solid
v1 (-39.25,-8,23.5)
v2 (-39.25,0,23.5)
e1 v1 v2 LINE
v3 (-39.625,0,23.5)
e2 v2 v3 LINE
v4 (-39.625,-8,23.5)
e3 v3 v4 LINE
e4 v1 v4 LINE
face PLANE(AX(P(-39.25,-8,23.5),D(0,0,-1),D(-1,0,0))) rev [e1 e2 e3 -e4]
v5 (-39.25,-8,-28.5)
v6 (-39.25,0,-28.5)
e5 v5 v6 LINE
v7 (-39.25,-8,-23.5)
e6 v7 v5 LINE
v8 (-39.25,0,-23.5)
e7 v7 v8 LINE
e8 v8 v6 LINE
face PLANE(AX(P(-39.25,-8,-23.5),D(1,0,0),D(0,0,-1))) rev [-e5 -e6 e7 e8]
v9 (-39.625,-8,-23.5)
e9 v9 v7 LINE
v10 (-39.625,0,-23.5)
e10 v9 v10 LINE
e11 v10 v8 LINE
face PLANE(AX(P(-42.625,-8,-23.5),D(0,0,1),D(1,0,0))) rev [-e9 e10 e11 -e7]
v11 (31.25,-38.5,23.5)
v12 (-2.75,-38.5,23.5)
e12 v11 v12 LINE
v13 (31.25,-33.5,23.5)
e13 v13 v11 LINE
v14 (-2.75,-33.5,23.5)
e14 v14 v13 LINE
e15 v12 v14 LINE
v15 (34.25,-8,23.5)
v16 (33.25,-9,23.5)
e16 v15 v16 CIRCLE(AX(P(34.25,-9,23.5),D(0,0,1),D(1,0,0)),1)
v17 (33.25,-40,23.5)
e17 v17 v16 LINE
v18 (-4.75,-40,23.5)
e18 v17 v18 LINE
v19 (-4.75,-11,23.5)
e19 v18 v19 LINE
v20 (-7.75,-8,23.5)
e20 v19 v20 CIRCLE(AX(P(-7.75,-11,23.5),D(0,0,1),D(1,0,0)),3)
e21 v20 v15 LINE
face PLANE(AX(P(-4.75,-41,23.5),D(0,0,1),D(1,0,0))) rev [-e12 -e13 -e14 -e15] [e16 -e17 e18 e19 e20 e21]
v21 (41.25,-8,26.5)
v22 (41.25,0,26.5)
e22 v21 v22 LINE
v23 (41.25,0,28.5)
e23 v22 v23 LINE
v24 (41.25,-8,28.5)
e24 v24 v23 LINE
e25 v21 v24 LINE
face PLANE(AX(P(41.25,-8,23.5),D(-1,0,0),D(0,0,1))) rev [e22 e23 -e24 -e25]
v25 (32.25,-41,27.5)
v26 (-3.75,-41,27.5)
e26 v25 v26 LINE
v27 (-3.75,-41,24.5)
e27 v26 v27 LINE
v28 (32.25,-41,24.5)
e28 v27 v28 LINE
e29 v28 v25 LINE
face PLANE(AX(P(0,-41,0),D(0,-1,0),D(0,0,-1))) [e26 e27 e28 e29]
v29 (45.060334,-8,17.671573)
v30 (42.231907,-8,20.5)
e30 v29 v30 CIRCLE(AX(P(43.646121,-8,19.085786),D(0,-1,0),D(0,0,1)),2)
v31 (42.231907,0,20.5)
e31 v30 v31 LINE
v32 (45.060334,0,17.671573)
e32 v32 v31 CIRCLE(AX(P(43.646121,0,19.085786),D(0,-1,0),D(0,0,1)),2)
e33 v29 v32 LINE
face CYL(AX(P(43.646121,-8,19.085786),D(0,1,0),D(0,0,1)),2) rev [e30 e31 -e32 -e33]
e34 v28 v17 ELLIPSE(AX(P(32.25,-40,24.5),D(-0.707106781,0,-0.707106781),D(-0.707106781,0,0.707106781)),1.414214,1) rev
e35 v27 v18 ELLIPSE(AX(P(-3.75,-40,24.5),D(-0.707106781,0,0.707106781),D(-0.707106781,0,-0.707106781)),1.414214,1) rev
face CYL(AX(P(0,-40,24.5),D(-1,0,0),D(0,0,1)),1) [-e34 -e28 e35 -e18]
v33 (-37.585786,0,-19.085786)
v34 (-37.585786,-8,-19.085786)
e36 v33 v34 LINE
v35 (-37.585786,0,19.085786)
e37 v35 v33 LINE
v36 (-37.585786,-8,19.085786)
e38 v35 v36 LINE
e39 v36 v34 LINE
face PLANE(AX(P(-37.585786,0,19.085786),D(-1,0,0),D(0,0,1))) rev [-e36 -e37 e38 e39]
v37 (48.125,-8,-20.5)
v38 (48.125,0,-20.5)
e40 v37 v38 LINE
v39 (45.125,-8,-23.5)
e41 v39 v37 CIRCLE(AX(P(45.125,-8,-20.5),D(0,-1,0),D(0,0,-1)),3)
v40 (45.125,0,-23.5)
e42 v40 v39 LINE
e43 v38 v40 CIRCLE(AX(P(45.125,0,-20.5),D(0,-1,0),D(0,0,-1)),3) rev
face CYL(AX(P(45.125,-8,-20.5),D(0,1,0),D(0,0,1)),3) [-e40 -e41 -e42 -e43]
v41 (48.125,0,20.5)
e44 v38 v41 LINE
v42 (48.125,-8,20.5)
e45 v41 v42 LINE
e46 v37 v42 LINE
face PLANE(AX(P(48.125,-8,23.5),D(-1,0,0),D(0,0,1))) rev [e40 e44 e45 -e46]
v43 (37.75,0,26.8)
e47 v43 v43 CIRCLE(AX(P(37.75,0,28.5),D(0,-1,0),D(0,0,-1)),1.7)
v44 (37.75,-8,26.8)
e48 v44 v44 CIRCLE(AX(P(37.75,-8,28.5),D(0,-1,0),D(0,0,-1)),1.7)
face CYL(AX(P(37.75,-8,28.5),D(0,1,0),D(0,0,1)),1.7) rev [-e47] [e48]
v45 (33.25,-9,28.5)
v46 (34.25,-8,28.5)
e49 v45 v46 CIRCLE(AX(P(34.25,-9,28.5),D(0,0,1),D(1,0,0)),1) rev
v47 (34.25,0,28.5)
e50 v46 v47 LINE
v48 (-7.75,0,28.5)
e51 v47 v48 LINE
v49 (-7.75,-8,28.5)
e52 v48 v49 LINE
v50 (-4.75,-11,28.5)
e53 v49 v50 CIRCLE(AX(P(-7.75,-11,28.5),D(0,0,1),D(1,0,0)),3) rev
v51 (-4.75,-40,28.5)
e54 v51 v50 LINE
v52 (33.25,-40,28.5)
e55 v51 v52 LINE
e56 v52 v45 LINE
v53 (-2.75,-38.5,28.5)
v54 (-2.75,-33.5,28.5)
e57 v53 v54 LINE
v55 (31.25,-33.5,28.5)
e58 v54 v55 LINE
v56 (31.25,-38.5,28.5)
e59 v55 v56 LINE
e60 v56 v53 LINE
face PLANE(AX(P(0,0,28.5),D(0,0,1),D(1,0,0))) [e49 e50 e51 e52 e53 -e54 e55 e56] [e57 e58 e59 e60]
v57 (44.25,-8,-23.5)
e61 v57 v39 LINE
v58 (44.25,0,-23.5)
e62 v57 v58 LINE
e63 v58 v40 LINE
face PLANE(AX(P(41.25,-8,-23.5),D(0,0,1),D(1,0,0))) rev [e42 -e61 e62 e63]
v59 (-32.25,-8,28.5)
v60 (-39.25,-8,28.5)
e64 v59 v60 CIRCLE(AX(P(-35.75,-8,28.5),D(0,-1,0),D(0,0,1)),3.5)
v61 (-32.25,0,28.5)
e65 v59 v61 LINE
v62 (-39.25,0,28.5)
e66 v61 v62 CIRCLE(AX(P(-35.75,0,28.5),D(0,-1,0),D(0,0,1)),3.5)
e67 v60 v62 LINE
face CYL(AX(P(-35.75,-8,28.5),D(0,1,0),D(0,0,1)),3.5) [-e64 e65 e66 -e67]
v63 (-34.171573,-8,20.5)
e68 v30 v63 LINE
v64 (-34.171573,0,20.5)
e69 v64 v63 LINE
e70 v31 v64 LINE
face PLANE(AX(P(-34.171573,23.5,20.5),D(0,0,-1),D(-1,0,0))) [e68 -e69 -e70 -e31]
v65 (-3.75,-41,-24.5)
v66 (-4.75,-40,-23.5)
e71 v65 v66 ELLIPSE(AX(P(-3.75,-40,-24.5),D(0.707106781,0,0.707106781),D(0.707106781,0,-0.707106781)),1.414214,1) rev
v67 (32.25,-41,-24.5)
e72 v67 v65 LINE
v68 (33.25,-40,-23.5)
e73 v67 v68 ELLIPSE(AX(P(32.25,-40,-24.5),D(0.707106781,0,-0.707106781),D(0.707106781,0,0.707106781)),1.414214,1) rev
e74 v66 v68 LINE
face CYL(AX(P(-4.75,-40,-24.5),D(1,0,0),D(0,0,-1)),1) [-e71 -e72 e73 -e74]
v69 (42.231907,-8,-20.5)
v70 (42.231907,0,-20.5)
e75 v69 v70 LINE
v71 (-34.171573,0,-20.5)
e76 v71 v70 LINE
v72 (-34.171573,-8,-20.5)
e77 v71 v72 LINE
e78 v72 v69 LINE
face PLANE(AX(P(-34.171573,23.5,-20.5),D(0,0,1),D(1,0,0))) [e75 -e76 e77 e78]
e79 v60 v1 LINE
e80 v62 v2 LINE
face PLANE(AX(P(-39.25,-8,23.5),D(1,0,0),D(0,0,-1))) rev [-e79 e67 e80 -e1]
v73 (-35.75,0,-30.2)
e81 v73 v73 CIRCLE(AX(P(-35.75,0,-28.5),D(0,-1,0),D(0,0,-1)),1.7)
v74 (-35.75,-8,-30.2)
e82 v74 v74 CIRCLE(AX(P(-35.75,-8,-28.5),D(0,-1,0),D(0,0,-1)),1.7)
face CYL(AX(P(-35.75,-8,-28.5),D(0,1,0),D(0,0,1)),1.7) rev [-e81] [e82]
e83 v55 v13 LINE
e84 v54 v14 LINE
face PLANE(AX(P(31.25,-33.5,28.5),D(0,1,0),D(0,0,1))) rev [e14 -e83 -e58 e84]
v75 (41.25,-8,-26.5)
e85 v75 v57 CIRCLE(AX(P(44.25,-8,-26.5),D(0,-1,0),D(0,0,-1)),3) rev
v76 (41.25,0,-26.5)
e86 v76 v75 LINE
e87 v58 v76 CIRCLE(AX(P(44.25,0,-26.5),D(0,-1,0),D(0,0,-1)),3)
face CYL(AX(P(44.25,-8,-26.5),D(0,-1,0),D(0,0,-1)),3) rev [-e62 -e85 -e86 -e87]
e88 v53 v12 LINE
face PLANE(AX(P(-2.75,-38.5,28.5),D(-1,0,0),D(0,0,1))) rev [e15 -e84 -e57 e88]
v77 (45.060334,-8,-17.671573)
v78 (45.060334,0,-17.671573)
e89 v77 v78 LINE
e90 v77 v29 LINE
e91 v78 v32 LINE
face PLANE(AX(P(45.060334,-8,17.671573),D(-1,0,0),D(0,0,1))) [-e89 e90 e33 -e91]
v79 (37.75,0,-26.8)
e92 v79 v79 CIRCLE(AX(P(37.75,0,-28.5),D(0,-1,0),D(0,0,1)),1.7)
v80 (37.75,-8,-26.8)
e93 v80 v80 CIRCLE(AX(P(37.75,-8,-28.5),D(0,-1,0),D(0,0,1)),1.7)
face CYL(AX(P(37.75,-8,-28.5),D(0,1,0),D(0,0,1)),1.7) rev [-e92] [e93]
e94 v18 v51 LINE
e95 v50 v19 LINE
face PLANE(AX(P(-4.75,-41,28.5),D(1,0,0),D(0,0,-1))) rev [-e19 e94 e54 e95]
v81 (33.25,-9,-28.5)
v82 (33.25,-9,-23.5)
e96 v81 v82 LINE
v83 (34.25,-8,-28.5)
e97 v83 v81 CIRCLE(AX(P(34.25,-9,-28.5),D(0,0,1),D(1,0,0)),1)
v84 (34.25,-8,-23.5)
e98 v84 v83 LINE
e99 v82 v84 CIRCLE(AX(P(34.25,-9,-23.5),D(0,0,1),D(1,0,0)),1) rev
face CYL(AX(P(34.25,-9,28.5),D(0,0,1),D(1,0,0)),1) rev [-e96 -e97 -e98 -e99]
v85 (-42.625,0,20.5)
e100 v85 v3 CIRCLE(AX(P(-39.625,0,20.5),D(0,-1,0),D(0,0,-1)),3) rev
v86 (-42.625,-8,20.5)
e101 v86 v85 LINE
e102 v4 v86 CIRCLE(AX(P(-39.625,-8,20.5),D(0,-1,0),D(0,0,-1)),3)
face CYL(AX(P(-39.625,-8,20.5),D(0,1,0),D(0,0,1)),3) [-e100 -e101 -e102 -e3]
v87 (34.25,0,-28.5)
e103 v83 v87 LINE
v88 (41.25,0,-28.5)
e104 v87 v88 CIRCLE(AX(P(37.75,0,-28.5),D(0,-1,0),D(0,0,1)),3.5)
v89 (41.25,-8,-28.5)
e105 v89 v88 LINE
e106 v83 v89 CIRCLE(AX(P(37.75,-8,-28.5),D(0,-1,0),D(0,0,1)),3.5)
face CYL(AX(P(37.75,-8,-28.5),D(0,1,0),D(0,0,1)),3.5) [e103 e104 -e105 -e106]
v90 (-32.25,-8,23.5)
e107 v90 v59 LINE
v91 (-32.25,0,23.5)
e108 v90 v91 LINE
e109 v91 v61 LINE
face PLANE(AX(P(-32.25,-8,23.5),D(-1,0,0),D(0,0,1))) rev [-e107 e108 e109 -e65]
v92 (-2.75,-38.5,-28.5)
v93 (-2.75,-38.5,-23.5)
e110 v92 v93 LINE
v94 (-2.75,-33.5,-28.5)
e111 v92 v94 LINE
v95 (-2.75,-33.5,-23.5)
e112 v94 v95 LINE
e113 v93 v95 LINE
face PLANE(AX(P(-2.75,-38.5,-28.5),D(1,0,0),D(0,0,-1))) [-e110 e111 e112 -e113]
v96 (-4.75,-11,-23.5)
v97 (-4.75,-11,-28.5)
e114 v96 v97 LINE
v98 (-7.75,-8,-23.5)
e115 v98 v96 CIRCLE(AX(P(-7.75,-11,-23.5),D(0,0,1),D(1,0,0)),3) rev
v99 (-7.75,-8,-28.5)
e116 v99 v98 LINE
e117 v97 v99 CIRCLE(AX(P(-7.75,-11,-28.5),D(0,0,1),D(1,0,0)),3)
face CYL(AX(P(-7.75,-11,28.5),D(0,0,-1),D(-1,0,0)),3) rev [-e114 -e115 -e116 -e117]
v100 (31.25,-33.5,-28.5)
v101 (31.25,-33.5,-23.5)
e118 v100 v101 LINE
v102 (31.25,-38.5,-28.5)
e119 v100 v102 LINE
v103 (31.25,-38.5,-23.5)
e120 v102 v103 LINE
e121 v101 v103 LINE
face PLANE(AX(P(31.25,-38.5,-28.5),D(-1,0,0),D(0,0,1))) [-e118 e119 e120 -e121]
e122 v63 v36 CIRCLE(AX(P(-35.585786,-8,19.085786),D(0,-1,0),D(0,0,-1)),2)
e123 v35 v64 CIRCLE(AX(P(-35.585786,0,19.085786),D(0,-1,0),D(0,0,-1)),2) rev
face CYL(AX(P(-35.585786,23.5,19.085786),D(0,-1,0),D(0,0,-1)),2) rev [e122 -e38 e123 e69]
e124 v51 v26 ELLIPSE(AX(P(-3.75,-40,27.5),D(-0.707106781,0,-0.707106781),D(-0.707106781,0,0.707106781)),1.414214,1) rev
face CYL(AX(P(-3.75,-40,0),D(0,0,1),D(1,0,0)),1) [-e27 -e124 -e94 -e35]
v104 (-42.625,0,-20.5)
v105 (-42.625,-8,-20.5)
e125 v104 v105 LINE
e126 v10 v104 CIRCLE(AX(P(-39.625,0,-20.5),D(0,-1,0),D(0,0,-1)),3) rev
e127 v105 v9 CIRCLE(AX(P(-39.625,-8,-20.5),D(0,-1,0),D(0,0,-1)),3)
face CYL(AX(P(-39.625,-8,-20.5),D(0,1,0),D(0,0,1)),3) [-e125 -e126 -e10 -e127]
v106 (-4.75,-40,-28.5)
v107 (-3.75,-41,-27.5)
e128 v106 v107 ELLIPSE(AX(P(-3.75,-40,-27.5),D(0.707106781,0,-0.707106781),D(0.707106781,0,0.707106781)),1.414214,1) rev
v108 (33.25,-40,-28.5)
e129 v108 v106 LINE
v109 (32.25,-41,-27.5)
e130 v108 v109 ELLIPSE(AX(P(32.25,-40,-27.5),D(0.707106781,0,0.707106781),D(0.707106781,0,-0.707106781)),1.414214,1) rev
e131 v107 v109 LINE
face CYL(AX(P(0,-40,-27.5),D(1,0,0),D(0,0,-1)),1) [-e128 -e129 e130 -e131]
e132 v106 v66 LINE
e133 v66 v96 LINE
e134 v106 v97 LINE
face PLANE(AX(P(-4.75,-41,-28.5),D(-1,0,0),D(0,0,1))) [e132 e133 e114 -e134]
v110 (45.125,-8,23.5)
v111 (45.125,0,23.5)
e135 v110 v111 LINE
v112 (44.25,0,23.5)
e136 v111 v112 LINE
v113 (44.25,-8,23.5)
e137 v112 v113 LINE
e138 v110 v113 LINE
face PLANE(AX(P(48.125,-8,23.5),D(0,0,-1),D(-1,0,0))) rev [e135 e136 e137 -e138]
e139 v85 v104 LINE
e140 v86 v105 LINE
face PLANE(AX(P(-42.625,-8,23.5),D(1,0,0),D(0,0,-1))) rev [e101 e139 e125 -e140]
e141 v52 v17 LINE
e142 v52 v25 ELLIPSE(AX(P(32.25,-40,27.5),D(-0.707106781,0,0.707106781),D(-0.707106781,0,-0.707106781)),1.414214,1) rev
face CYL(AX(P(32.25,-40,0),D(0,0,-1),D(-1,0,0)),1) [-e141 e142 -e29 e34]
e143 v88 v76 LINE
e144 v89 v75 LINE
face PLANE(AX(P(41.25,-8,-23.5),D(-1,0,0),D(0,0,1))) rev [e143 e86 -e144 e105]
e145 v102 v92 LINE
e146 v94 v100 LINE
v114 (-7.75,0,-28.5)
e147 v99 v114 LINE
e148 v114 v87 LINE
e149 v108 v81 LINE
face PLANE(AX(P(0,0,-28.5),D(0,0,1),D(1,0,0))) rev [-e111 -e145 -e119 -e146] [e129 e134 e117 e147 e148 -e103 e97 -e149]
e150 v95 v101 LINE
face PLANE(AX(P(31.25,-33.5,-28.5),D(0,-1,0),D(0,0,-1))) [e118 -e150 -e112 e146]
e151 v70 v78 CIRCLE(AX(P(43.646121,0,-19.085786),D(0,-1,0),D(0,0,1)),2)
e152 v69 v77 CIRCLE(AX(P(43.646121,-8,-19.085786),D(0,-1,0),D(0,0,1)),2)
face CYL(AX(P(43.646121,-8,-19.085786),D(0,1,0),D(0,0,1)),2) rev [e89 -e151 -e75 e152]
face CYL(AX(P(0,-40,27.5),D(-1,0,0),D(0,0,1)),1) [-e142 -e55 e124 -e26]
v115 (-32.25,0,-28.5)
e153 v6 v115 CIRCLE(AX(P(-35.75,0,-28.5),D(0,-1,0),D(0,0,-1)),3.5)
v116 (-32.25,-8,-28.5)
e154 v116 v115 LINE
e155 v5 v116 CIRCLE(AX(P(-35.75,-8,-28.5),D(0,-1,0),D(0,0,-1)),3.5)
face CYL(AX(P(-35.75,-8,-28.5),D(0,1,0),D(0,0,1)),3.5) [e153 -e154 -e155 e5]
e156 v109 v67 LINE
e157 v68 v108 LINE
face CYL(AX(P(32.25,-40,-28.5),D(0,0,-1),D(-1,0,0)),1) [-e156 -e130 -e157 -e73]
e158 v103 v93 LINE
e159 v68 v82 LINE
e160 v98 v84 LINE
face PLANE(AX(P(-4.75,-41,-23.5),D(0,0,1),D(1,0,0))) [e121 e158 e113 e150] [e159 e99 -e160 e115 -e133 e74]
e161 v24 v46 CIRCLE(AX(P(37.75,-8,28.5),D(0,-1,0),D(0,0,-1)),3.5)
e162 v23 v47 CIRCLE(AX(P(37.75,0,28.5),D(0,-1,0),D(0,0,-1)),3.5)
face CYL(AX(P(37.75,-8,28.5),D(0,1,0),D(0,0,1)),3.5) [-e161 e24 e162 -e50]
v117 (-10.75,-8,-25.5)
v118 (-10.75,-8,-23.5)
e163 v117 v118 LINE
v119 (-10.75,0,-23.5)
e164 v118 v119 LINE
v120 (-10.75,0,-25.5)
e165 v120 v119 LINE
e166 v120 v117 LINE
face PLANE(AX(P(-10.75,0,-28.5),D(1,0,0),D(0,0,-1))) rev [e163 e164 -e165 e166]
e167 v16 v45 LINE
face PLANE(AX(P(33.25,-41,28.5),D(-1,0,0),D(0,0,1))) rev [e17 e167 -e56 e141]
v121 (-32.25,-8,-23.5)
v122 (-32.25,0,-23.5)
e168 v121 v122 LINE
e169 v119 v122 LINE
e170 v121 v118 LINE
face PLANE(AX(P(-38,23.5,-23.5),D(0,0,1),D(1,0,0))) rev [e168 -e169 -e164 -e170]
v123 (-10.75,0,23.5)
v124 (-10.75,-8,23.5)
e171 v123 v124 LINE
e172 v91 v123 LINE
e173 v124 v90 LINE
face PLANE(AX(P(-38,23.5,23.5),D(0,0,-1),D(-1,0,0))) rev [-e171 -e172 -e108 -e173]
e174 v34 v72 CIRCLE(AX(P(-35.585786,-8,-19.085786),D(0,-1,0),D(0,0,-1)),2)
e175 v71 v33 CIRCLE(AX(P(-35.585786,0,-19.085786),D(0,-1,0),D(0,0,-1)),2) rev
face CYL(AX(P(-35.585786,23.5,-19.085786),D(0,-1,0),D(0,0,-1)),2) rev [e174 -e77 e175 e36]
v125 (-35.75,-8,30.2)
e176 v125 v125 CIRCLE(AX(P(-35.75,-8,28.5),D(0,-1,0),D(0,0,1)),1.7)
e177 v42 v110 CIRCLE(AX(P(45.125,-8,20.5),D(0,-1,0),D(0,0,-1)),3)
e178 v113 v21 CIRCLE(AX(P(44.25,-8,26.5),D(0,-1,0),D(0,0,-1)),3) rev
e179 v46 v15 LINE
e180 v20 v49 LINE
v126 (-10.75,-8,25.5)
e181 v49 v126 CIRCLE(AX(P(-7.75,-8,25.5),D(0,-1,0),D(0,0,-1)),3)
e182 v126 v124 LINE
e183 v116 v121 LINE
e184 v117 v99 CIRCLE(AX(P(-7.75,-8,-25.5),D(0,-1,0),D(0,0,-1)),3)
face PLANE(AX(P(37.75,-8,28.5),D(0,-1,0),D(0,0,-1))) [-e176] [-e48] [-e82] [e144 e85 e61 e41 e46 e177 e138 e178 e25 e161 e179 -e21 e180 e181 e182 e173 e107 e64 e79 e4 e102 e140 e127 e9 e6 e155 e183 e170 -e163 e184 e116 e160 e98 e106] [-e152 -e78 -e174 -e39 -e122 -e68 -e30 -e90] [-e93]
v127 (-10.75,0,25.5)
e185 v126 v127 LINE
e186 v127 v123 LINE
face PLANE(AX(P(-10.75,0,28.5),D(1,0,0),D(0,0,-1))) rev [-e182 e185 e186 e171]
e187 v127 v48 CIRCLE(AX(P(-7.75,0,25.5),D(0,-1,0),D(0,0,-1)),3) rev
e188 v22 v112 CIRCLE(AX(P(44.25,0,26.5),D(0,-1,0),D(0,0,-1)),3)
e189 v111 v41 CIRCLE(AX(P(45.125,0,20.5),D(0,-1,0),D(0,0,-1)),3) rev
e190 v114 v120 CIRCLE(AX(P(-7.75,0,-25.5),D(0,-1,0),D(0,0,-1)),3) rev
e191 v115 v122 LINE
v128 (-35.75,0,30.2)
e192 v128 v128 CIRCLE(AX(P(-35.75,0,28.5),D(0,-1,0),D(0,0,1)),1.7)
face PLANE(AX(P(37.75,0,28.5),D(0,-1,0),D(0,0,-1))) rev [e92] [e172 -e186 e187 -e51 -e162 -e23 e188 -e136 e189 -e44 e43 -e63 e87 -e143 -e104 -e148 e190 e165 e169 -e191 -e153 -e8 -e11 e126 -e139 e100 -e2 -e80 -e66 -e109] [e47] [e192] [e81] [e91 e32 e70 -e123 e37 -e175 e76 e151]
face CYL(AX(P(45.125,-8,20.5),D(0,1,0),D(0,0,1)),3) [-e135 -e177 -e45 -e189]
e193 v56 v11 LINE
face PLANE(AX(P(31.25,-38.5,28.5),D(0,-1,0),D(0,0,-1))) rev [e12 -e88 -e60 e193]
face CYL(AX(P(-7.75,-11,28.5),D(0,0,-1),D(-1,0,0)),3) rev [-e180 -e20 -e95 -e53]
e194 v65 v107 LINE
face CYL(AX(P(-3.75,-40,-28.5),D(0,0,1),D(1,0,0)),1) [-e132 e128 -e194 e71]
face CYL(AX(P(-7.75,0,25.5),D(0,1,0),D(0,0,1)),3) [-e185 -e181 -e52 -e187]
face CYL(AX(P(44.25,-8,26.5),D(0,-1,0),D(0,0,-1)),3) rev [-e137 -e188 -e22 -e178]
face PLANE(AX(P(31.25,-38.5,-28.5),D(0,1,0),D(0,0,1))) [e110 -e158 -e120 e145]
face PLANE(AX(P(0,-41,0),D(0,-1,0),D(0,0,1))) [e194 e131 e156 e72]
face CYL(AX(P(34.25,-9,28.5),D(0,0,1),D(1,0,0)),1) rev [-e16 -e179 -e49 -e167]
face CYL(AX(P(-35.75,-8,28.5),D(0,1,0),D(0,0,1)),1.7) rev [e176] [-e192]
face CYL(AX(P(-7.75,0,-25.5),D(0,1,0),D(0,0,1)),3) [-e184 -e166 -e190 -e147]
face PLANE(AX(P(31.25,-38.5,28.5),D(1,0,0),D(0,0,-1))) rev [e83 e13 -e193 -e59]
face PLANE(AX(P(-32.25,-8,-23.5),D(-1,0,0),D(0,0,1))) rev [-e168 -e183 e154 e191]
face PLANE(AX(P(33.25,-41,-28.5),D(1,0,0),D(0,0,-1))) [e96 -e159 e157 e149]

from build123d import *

# Parameters (mm, degrees)
EXTRUDE_1_DEPTH     = 23.5
EXTRUDE_START       = 8
SKETCH_2_R          = 1.7
EXTRUDE_2_DEPTH     = 8
CUT_EXTRUDE_1_REACH = 98.655
CUT_EXTRUDE_2_REACH = 79.127
CUT_EXTRUDE_3_REACH = 93.669
SKETCH_9_W          = 45
SKETCH_9_H          = 8
EXTRUDE_3_DEPTH     = 5
SKETCH_10_W         = 45
SKETCH_10_H         = 8
EXTRUDE_4_DEPTH     = 5
SKETCH_11_W         = 38
SKETCH_11_H         = 5
EXTRUDE_5_DEPTH     = 33
SKETCH_12_W         = 34
SKETCH_12_H         = 5
CUT_EXTRUDE_4_DEPTH = 5
CUT_EXTRUDE_START   = -23.5
CUT_EXTRUDE_5_DEPTH = 23.5
CUT_EXTRUDE_6_DEPTH = 67.550849919
FILLET_1_R          = 3
FILLET_2_R          = 1
FILLET_3_R          = 1


with BuildPart() as part:
    # 草图1 → 凸台-拉伸1 (new body)
    with BuildSketch(Plane(origin=(0, 0, 0), x_dir=(1, 0, 0), z_dir=(0, 1, 0))):
        with BuildLine():
            Line((-38, 23.5), (40, 23.5))
            Line((40, 23.5), (40, -23.5))
            Line((40, -23.5), (-38, -23.5))
            ThreePointArc((-38, -23.5), (-39.414213562, -22.914213562), (-40, -21.5))
            Line((-40, -21.5), (-40, 21.5))
            ThreePointArc((-40, 21.5), (-39.414213562, 22.914213562), (-38, 23.5))
        make_face()
        with BuildLine():
            Line((-34.171572875, -20.5), (36, -20.5))
            ThreePointArc((36, -20.5), (37.414213562, -19.914213562), (38, -18.5))
            Line((38, -18.5), (38, 18.5))
            ThreePointArc((38, 18.5), (37.414213562, 19.914213562), (36, 20.5))
            Line((36, 20.5), (-34.171572875, 20.5))
            ThreePointArc((-34.171572875, 20.5), (-37, 20.5), (-37, 17.671572875))
            Line((-37, 17.671572875), (-37, -17.671572875))
            ThreePointArc((-37, -17.671572875), (-37, -20.5), (-34.171572875, -20.5))
        make_face(mode=Mode.SUBTRACT)
    extrude(amount=EXTRUDE_1_DEPTH)

    # 草图2 → 凸台-拉伸2 (add)
    with BuildSketch(Plane.XZ.offset(EXTRUDE_START)):
        with BuildLine():
            Line((48.125, 23.5), (41.25, 23.5))
            Line((41.25, 23.5), (41.25, 28.5))
            ThreePointArc((41.25, 28.5), (37.75, 32), (34.25, 28.5))
            Line((34.25, 28.5), (34.25, 23.5))
            Line((34.25, 23.5), (-32.25, 23.5))
            Line((-32.25, 23.5), (-32.25, 28.5))
            ThreePointArc((-32.25, 28.5), (-35.75, 32), (-39.25, 28.5))
            Line((-39.25, 28.5), (-39.25, 23.5))
            Line((-39.25, 23.5), (-42.625, 23.5))
            Line((-42.625, 23.5), (-42.625, -23.5))
            Line((-42.625, -23.5), (-39.25, -23.5))
            Line((-39.25, -23.5), (-39.25, -28.5))
            ThreePointArc((-39.25, -28.5), (-35.75, -32), (-32.25, -28.5))
            Line((-32.25, -28.5), (-32.25, -23.5))
            Line((-32.25, -23.5), (34.25, -23.5))
            Line((34.25, -23.5), (34.25, -28.5))
            ThreePointArc((34.25, -28.5), (37.75, -32), (41.25, -28.5))
            Line((41.25, -28.5), (41.25, -23.5))
            Line((41.25, -23.5), (48.125, -23.5))
            Line((48.125, -23.5), (48.125, 23.5))
        make_face()
        with Locations(Location((37.75, 28.5, 0), (0, 0, 270))):
            Circle(SKETCH_2_R, mode=Mode.SUBTRACT)
        with Locations(Location((37.75, -28.5, 0), (0, 0, 90))):
            Circle(SKETCH_2_R, mode=Mode.SUBTRACT)
        with Locations(Location((-35.75, -28.5, 0), (0, 0, 270))):
            Circle(SKETCH_2_R, mode=Mode.SUBTRACT)
        with Locations(Location((-35.75, 28.5, 0), (0, 0, 90))):
            Circle(SKETCH_2_R, mode=Mode.SUBTRACT)
        with BuildLine():
            Line((-34.171572875, 20.5), (42.231907087, 20.5))
            ThreePointArc((42.231907087, 20.5), (45.060334211, 20.5), (45.060334211, 17.671572875))
            Line((45.060334211, 17.671572875), (45.060334211, -17.671572875))
            ThreePointArc((45.060334211, -17.671572875), (45.060334211, -20.5), (42.231907087, -20.5))
            Line((42.231907087, -20.5), (-34.171572875, -20.5))
            ThreePointArc((-34.171572875, -20.5), (-37, -20.5), (-37, -17.671572875))
            Line((-37, -17.671572875), (-37, 17.671572875))
            ThreePointArc((-37, 17.671572875), (-37, 20.5), (-34.171572875, 20.5))
        make_face(mode=Mode.SUBTRACT)
    extrude(amount=-EXTRUDE_2_DEPTH)

    # 草图4 → 切除-拉伸1 (cut, up to next)
    with BuildSketch(Plane.ZY.offset(40), mode=Mode.PRIVATE) as cut_extrude_1_sk1:
        with BuildLine():
            Line((17, 0), (-17, 0))
            ThreePointArc((-17, 0), (-19.121320344, 0.878679656), (-20, 3))
            Line((-20, 3), (-20, 17.5))
            ThreePointArc((-20, 17.5), (-19.121320344, 19.621320344), (-17, 20.5))
            Line((-17, 20.5), (17, 20.5))
            ThreePointArc((17, 20.5), (19.121320344, 19.621320344), (20, 17.5))
            Line((20, 17.5), (20, 3))
            ThreePointArc((20, 3), (19.121320344, 0.878679656), (17, 0))
        make_face()
    cut_extrude_1_tool1 = extrude(cut_extrude_1_sk1.sketch, amount=-CUT_EXTRUDE_1_REACH, mode=Mode.PRIVATE) & part.part
    add(cut_extrude_1_tool1.solids().sort_by_distance((-40, 10.25, 0))[0], mode=Mode.SUBTRACT)

    # 切除-拉伸2: up to this face of the body (flat: up to its plane)
    cut_extrude_2_end = Plane(part.part.faces().sort_by_distance((1, 8.207082452, 23.5))[0])
    # 草图5 → 切除-拉伸2 (cut, up to the picked face)
    with BuildSketch(Plane(origin=(0, 0, -23.5), x_dir=(-1, 0, 0), z_dir=(0, 0, -1)), mode=Mode.PRIVATE) as cut_extrude_2_sk1:
        with BuildLine():
            Line((-37, 11.75), (-37, 17.5))
            ThreePointArc((-37, 17.5), (-36.414213562, 18.914213562), (-35, 19.5))
            Line((-35, 19.5), (33, 19.5))
            ThreePointArc((33, 19.5), (34.414213562, 18.914213562), (35, 17.5))
            Line((35, 17.5), (35, 6))
            ThreePointArc((35, 6), (34.414213562, 4.585786438), (33, 4))
            Line((33, 4), (-35, 4))
            ThreePointArc((-35, 4), (-36.414213562, 4.585786438), (-37, 6))
            Line((-37, 6), (-37, 11.75))
        make_face()
    cut_extrude_2_tool1 = split(extrude(cut_extrude_2_sk1.sketch, amount=-CUT_EXTRUDE_2_REACH, mode=Mode.PRIVATE), bisect_by=cut_extrude_2_end, keep=Keep.BOTH, mode=Mode.PRIVATE)
    add(cut_extrude_2_tool1.solids().sort_by(Axis((1, 11.75, -23.5), (0, 0, 1)))[0], mode=Mode.SUBTRACT)

    # 草图6 → 切除-拉伸3 (cut, up to next)
    with BuildSketch(Plane(origin=(40, 0, 0), x_dir=(0, 0, -1), z_dir=(1, 0, 0)), mode=Mode.PRIVATE) as cut_extrude_3_sk1:
        with BuildLine():
            Line((21, 5), (21, 18.5))
            ThreePointArc((21, 18.5), (20.414213562, 19.914213562), (19, 20.5))
            Line((19, 20.5), (-19, 20.5))
            ThreePointArc((-19, 20.5), (-20.414213562, 19.914213562), (-21, 18.5))
            Line((-21, 18.5), (-21, 5))
            Line((-21, 5), (-21, 0))
            Line((-21, 0), (-16, 0))
            Line((-16, 0), (16, 0))
            Line((16, 0), (21, 0))
            Line((21, 0), (21, 5))
        make_face()
    cut_extrude_3_tool1 = extrude(cut_extrude_3_sk1.sketch, amount=-CUT_EXTRUDE_3_REACH, mode=Mode.PRIVATE) & part.part
    add(cut_extrude_3_tool1.solids().sort_by_distance((40, 10.230413, 0))[0], mode=Mode.SUBTRACT)

    # 草图9 → 凸台-拉伸3 (add)
    with BuildSketch(Plane.XY.offset(23.5)):
        with Locations((11.75, -4)):
            Rectangle(SKETCH_9_W, SKETCH_9_H)
    extrude(amount=EXTRUDE_3_DEPTH)

    # 草图10 → 凸台-拉伸4 (add)
    with BuildSketch(Plane(origin=(0, 0, -23.5), x_dir=(-1, 0, 0), z_dir=(0, 0, -1))):
        with Locations((-11.75, -4)):
            Rectangle(SKETCH_10_W, SKETCH_10_H)
    extrude(amount=EXTRUDE_4_DEPTH)

    # 草图11 → 凸台-拉伸5 (add)
    with BuildSketch(Plane.XZ.offset(8)):
        with Locations((14.25, 26)):
            Rectangle(SKETCH_11_W, SKETCH_11_H)
    extrude_5 = extrude(amount=EXTRUDE_5_DEPTH)

    # 草图12 → 切除-拉伸4 (cut)
    with BuildSketch(Plane(origin=(0, 0, 23.5), x_dir=(-1, 0, 0), z_dir=(0, 0, -1))):
        with Locations((-14.25, -36)):
            Rectangle(SKETCH_12_W, SKETCH_12_H)
    cut_extrude_4 = extrude(amount=-CUT_EXTRUDE_4_DEPTH, mode=Mode.SUBTRACT)

    # 镜向1: 凸台-拉伸5, 切除-拉伸4 across plane
    add(extrude_5.mirror(Plane.XY))
    add(cut_extrude_4.mirror(Plane.XY), mode=Mode.SUBTRACT)

    # 草图13 → 切除-拉伸5 (cut)
    with BuildSketch(Plane(origin=(0, 23.5, 0), x_dir=(1, 0, 0), z_dir=(0, 1, 0)).offset(CUT_EXTRUDE_START)):
        with BuildLine():
            Line((-38, 23.5), (40, 23.5))
            Line((40, 23.5), (40, -23.5))
            Line((40, -23.5), (-38, -23.5))
            ThreePointArc((-38, -23.5), (-39.414213562, -22.914213562), (-40, -21.5))
            Line((-40, -21.5), (-40, 21.5))
            ThreePointArc((-40, 21.5), (-39.414213562, 22.914213562), (-38, 23.5))
        make_face()
        with BuildLine():
            Line((38, 18.5), (38, -18.5))
            ThreePointArc((38, -18.5), (37.414213562, -19.914213562), (36, -20.5))
            Line((36, -20.5), (-34.171572875, -20.5))
            ThreePointArc((-34.171572875, -20.5), (-37, -20.5), (-37, -17.671572875))
            Line((-37, -17.671572875), (-37, 17.671572875))
            ThreePointArc((-37, 17.671572875), (-37, 20.5), (-34.171572875, 20.5))
            Line((-34.171572875, 20.5), (36, 20.5))
            ThreePointArc((36, 20.5), (37.414213562, 19.914213562), (38, 18.5))
        make_face(mode=Mode.SUBTRACT)
    extrude(amount=CUT_EXTRUDE_5_DEPTH, mode=Mode.SUBTRACT)

    # 草图14 → 切除-拉伸6 (cut, through all)
    with BuildSketch(Plane.XZ.offset(8)):
        with BuildLine():
            Line((-37.585786438, 19.085786438), (-37.585786438, -19.085786438))
            ThreePointArc((-37.585786438, -19.085786438), (-37.433545503, -18.320419573), (-37, -17.671572875))
            Line((-37, -17.671572875), (-37, 17.671572875))
            ThreePointArc((-37, 17.671572875), (-37.433545503, 18.320419573), (-37.585786438, 19.085786438))
        make_face()
    extrude(amount=-CUT_EXTRUDE_6_DEPTH, mode=Mode.SUBTRACT)

    # 圆角1
    fillet_1_edges = [part.edges().sort_by_distance(p)[0] for p in [
        (-10.75, -4, 28.5),
        (-10.75, -4, -28.5),
        (-42.625, -4, 23.5),
        (-42.625, -4, -23.5),
        (-4.75, -8, 26),
        (-4.75, -8, -26),
        (41.25, -4, 23.5),
        (41.25, -4, -23.5),
        (48.125, -4, 23.5),
        (48.125, -4, -23.5),
    ]]
    fillet(fillet_1_edges, radius=FILLET_1_R - 0.0001)  # a hair under: the kernel refuses the full size

    # 圆角2
    fillet_2_edges = [part.edges().sort_by_distance(p)[0] for p in [
        (33.25, -8, 26),
        (33.25, -8, -26),
    ]]
    fillet(fillet_2_edges, radius=FILLET_2_R)

    # 圆角3
    fillet_3_edges = [part.edges().sort_by_distance(p)[0] for p in [
        (-4.75, -41, 26),
        (14.25, -41, 23.5),
        (33.25, -41, 26),
        (14.25, -41, 28.5),
        (-4.75, -41, -26),
        (14.25, -41, -28.5),
        (33.25, -41, -26),
        (14.25, -41, -23.5),
    ]]
    fillet(fillet_3_edges, radius=FILLET_3_R)


solid = part.part
